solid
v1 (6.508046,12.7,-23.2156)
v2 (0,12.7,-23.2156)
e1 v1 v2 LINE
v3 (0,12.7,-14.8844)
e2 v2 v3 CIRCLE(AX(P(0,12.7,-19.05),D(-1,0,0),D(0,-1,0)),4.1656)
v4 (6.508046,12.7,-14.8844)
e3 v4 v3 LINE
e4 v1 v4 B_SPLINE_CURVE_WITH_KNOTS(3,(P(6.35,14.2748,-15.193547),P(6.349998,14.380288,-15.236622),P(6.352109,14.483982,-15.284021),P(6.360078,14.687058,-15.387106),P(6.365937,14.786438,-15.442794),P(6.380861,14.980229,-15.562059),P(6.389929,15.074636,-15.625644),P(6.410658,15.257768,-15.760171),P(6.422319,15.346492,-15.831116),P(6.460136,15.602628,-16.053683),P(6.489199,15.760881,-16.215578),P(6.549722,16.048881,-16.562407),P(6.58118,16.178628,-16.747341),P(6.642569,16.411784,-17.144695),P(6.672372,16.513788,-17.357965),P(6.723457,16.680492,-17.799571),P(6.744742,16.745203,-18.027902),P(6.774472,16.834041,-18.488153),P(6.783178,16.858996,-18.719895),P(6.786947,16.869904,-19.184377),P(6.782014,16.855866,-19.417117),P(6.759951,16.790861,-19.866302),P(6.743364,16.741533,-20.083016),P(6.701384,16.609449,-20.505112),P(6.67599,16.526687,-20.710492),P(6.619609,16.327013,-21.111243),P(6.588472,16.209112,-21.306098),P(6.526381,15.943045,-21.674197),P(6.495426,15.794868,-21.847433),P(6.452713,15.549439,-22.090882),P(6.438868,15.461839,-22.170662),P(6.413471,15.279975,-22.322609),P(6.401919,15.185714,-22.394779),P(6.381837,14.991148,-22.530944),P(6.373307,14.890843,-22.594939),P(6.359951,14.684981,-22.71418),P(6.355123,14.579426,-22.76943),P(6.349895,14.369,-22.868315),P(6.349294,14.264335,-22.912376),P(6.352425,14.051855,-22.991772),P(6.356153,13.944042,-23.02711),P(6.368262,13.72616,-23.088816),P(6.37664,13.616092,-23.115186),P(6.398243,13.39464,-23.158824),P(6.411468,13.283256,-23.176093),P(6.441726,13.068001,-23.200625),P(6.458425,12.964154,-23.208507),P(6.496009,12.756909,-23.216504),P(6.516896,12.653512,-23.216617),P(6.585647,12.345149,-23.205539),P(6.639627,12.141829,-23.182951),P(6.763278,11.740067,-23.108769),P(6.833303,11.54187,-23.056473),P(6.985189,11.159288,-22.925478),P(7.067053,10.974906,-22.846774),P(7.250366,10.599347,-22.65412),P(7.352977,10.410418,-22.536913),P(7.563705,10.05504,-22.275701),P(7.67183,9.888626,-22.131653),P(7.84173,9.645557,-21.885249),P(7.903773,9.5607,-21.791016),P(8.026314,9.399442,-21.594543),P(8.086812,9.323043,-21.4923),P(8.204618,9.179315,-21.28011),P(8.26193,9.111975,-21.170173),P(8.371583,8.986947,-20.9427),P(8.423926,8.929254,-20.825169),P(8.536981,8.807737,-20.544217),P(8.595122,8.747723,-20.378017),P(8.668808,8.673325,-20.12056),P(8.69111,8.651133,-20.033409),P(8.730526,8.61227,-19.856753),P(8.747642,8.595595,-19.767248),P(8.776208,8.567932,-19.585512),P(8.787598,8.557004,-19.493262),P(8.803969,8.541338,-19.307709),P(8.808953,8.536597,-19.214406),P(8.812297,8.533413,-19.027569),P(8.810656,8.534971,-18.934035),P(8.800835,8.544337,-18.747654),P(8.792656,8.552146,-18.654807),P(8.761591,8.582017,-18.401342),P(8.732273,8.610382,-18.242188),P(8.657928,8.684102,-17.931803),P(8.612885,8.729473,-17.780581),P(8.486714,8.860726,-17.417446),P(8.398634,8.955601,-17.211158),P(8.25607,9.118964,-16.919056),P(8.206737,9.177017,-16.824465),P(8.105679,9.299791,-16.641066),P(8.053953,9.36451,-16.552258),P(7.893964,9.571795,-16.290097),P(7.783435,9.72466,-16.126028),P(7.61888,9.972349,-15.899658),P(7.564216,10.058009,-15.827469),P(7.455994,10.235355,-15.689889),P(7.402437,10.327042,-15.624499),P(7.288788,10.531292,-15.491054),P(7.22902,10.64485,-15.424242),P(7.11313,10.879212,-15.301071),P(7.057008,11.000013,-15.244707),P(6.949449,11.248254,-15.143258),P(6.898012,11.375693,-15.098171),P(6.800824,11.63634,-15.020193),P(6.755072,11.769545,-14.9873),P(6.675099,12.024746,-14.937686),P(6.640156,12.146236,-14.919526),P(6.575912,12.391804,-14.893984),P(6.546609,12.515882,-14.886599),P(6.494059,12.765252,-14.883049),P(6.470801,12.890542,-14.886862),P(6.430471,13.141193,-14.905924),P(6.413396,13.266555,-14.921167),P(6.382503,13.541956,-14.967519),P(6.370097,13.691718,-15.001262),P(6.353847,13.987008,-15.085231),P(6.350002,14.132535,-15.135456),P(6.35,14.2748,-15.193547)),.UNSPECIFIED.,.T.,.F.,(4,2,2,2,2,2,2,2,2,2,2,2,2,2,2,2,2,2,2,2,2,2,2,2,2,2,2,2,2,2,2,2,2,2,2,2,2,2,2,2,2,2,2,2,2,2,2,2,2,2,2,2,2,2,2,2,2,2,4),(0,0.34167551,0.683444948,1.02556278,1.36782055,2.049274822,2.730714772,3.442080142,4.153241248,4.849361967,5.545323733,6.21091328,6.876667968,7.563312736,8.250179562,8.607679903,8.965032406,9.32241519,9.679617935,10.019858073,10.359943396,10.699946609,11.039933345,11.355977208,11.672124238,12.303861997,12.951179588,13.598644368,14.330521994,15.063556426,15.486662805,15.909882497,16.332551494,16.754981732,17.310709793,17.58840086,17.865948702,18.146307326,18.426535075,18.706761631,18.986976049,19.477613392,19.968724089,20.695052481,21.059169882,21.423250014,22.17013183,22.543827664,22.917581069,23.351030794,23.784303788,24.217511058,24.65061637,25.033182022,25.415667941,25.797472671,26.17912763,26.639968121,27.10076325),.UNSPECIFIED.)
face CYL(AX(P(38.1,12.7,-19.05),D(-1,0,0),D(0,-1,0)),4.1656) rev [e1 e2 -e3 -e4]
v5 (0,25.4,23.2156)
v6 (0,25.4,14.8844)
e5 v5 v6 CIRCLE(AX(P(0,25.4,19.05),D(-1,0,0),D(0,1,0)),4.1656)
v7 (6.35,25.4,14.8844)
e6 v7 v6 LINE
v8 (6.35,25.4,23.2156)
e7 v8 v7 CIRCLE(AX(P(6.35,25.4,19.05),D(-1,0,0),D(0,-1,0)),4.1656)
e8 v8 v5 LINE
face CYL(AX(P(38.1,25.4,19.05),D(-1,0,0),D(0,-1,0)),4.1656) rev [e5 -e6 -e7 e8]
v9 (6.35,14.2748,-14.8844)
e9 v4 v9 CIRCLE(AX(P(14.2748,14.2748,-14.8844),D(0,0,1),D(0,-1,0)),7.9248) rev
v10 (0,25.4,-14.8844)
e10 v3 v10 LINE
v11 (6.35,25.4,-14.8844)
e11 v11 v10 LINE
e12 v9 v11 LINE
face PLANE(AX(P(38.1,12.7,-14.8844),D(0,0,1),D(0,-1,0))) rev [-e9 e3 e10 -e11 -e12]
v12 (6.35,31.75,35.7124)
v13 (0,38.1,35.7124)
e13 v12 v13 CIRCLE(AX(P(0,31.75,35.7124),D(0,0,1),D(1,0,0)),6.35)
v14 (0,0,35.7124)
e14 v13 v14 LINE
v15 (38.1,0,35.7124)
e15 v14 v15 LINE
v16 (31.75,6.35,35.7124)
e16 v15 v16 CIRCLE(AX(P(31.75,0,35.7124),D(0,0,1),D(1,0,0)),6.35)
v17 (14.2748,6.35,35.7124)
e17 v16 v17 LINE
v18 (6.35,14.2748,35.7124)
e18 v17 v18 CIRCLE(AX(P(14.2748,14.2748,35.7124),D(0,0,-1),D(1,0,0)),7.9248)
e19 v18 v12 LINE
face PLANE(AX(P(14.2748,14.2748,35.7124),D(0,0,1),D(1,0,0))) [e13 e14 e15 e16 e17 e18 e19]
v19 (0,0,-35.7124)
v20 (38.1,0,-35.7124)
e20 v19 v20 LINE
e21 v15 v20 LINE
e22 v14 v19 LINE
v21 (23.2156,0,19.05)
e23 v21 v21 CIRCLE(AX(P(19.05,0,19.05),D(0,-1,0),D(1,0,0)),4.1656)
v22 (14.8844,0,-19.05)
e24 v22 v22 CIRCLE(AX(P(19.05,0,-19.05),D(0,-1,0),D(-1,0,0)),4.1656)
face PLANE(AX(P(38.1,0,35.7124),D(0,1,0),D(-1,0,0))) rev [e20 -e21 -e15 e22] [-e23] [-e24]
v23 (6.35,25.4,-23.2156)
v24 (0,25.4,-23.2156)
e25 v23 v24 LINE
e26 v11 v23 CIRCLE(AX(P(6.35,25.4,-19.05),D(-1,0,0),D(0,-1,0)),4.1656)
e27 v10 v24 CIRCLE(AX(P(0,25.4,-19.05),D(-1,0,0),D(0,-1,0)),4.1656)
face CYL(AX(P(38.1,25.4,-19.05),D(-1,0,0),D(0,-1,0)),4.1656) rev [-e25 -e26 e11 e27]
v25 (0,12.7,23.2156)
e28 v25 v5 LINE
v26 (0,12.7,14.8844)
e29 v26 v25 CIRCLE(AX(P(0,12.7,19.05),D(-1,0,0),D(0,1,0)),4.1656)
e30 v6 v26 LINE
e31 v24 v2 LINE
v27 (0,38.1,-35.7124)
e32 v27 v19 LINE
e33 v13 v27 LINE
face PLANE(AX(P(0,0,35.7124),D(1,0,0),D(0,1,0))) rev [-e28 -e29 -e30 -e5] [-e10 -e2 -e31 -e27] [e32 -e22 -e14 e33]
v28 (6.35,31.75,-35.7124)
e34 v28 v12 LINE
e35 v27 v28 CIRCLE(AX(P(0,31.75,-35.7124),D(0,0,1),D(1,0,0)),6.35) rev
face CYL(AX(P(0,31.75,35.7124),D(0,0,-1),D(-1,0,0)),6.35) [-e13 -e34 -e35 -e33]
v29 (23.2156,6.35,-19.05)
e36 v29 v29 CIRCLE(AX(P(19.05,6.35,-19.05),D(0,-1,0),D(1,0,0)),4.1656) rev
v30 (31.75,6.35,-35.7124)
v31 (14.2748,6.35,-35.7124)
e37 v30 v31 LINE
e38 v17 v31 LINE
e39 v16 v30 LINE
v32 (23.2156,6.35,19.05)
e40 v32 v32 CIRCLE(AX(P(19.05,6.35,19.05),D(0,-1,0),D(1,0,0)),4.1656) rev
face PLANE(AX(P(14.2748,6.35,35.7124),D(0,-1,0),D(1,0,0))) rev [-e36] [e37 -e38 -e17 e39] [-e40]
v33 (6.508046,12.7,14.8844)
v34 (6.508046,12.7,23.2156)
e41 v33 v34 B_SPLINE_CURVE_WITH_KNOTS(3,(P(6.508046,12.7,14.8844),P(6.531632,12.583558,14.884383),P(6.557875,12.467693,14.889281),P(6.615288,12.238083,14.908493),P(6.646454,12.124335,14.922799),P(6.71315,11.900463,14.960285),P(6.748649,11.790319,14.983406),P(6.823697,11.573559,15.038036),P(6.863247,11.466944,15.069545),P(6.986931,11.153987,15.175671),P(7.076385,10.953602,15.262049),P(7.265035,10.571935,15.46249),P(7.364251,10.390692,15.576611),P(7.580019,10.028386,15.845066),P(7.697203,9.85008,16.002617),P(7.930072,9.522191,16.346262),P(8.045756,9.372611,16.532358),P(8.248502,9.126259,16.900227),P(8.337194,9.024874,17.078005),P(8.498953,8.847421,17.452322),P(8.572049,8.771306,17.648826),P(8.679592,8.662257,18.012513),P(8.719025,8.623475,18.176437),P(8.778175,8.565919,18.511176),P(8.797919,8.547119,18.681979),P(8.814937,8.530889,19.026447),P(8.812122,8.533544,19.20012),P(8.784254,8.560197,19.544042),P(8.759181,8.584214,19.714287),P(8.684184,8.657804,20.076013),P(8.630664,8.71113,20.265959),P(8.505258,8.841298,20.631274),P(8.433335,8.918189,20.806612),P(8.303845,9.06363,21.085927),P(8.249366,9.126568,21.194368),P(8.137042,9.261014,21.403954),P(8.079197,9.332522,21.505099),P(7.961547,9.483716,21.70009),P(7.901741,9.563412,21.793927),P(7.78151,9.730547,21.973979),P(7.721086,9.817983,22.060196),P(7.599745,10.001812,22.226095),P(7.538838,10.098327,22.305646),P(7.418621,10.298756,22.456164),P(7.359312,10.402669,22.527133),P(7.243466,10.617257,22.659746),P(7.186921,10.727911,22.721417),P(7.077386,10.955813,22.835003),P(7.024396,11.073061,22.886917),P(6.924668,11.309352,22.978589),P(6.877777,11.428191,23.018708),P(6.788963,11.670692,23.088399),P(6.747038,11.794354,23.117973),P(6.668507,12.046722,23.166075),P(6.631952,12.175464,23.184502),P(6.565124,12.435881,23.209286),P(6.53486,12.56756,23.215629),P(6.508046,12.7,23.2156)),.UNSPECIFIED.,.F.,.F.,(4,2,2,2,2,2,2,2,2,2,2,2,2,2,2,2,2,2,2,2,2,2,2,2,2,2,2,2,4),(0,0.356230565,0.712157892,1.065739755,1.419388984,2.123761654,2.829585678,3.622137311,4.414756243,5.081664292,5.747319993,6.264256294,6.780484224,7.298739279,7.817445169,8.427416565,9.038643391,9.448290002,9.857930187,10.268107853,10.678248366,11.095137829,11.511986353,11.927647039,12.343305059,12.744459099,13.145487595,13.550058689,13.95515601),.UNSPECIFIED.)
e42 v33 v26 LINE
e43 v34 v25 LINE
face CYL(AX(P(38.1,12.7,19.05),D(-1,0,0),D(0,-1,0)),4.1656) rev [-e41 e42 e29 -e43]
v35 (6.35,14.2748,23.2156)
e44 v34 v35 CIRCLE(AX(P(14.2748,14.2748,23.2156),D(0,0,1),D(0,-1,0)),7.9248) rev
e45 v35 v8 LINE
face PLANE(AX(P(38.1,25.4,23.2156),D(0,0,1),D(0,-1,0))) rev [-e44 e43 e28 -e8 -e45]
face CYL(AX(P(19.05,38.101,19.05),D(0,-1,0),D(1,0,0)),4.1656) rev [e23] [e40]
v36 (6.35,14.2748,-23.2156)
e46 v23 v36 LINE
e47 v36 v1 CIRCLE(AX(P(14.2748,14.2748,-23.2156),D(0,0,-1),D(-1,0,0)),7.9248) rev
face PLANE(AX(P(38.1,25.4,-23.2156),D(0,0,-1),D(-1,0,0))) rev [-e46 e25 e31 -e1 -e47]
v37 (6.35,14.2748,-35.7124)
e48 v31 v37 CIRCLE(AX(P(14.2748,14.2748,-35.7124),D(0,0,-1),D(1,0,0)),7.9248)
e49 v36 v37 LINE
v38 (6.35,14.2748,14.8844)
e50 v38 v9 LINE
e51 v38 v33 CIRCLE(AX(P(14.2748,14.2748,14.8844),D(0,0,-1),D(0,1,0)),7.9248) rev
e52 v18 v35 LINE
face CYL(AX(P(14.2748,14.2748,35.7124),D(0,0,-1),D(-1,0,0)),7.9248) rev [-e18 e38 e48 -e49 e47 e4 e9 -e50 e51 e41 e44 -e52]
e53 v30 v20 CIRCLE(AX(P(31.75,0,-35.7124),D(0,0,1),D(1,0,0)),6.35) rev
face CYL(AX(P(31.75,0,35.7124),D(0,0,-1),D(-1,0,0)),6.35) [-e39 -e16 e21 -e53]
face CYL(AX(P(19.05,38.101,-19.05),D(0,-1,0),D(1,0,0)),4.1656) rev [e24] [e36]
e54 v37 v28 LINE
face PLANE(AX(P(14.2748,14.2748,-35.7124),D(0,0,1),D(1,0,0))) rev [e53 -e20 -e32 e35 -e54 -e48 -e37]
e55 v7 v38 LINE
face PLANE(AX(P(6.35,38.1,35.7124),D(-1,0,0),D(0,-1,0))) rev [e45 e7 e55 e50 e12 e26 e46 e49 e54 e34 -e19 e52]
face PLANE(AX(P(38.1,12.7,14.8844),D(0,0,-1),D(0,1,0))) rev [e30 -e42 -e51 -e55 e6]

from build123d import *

# Parameters (mm, degrees)
BOSS_EXTRUDE1_DEPTH = 35.7124
FILLET1_R           = 6.35
CUT_EXTRUDE1_DEPTH  = 65.64205685
CUT_EXTRUDE2_REACH  = 66.642
SKETCH4_R           = 4.1656


with BuildPart() as part:
    # Sketch2 → Boss-Extrude1 (new, symmetric)
    with BuildSketch(Plane.XY):
        with BuildLine():
            Line((0, 0), (0, 38.1))
            Line((0, 38.1), (6.35, 38.1))
            Line((6.35, 38.1), (6.35, 14.2748))
            ThreePointArc((6.35, 14.2748), (8.67112018, 8.67112018), (14.2748, 6.35))
            Line((14.2748, 6.35), (38.1, 6.35))
            Line((38.1, 6.35), (38.1, 0))
            Line((38.1, 0), (0, 0))
        make_face()
    extrude(amount=BOSS_EXTRUDE1_DEPTH, both=True)

    # Fillet1
    fillet1_edges = [part.edges().sort_by_distance(p)[0] for p in [
        (38.1, 6.35, 0),
        (6.35, 38.1, 0),
    ]]
    fillet(fillet1_edges, radius=FILLET1_R - 0.0001)  # a hair under: the kernel refuses the full size

    # Sketch3 → Cut-Extrude1 (cut, through all)
    with BuildSketch(Plane.ZY):
        with BuildLine():
            Line((-23.2156, 25.4), (-23.2156, 12.7))
            ThreePointArc((-23.2156, 12.7), (-19.05, 8.5344), (-14.8844, 12.7))
            Line((-14.8844, 12.7), (-14.8844, 25.4))
            ThreePointArc((-14.8844, 25.4), (-19.05, 29.5656), (-23.2156, 25.4))
        make_face()
        with BuildLine():
            Line((14.8844, 12.7), (14.8844, 25.4))
            ThreePointArc((14.8844, 25.4), (19.05, 29.5656), (23.2156, 25.4))
            Line((23.2156, 25.4), (23.2156, 12.7))
            ThreePointArc((23.2156, 12.7), (19.05, 8.5344), (14.8844, 12.7))
        make_face()
    extrude(amount=-CUT_EXTRUDE1_DEPTH, mode=Mode.SUBTRACT)

    # Sketch4 → Cut-Extrude2 (cut, up to next)
    with BuildSketch(Plane.XZ, mode=Mode.PRIVATE) as cut_extrude2_sk1:
        with Locations((19.05, -19.05)):
            Circle(SKETCH4_R)
    cut_extrude2_tool1 = extrude(cut_extrude2_sk1.sketch, amount=-CUT_EXTRUDE2_REACH, mode=Mode.PRIVATE) & part.part
    # Sketch4 → Cut-Extrude2 (cut, up to next)
    with BuildSketch(Plane.XZ, mode=Mode.PRIVATE) as cut_extrude2_sk2:
        with Locations((19.05, 19.05)):
            Circle(SKETCH4_R)
    cut_extrude2_tool2 = extrude(cut_extrude2_sk2.sketch, amount=-CUT_EXTRUDE2_REACH, mode=Mode.PRIVATE) & part.part
    add(cut_extrude2_tool1.solids().sort_by_distance((19.05, 0, -19.05))[0], mode=Mode.SUBTRACT)
    add(cut_extrude2_tool2.solids().sort_by_distance((19.05, 0, 19.05))[0], mode=Mode.SUBTRACT)


solid = part.part
